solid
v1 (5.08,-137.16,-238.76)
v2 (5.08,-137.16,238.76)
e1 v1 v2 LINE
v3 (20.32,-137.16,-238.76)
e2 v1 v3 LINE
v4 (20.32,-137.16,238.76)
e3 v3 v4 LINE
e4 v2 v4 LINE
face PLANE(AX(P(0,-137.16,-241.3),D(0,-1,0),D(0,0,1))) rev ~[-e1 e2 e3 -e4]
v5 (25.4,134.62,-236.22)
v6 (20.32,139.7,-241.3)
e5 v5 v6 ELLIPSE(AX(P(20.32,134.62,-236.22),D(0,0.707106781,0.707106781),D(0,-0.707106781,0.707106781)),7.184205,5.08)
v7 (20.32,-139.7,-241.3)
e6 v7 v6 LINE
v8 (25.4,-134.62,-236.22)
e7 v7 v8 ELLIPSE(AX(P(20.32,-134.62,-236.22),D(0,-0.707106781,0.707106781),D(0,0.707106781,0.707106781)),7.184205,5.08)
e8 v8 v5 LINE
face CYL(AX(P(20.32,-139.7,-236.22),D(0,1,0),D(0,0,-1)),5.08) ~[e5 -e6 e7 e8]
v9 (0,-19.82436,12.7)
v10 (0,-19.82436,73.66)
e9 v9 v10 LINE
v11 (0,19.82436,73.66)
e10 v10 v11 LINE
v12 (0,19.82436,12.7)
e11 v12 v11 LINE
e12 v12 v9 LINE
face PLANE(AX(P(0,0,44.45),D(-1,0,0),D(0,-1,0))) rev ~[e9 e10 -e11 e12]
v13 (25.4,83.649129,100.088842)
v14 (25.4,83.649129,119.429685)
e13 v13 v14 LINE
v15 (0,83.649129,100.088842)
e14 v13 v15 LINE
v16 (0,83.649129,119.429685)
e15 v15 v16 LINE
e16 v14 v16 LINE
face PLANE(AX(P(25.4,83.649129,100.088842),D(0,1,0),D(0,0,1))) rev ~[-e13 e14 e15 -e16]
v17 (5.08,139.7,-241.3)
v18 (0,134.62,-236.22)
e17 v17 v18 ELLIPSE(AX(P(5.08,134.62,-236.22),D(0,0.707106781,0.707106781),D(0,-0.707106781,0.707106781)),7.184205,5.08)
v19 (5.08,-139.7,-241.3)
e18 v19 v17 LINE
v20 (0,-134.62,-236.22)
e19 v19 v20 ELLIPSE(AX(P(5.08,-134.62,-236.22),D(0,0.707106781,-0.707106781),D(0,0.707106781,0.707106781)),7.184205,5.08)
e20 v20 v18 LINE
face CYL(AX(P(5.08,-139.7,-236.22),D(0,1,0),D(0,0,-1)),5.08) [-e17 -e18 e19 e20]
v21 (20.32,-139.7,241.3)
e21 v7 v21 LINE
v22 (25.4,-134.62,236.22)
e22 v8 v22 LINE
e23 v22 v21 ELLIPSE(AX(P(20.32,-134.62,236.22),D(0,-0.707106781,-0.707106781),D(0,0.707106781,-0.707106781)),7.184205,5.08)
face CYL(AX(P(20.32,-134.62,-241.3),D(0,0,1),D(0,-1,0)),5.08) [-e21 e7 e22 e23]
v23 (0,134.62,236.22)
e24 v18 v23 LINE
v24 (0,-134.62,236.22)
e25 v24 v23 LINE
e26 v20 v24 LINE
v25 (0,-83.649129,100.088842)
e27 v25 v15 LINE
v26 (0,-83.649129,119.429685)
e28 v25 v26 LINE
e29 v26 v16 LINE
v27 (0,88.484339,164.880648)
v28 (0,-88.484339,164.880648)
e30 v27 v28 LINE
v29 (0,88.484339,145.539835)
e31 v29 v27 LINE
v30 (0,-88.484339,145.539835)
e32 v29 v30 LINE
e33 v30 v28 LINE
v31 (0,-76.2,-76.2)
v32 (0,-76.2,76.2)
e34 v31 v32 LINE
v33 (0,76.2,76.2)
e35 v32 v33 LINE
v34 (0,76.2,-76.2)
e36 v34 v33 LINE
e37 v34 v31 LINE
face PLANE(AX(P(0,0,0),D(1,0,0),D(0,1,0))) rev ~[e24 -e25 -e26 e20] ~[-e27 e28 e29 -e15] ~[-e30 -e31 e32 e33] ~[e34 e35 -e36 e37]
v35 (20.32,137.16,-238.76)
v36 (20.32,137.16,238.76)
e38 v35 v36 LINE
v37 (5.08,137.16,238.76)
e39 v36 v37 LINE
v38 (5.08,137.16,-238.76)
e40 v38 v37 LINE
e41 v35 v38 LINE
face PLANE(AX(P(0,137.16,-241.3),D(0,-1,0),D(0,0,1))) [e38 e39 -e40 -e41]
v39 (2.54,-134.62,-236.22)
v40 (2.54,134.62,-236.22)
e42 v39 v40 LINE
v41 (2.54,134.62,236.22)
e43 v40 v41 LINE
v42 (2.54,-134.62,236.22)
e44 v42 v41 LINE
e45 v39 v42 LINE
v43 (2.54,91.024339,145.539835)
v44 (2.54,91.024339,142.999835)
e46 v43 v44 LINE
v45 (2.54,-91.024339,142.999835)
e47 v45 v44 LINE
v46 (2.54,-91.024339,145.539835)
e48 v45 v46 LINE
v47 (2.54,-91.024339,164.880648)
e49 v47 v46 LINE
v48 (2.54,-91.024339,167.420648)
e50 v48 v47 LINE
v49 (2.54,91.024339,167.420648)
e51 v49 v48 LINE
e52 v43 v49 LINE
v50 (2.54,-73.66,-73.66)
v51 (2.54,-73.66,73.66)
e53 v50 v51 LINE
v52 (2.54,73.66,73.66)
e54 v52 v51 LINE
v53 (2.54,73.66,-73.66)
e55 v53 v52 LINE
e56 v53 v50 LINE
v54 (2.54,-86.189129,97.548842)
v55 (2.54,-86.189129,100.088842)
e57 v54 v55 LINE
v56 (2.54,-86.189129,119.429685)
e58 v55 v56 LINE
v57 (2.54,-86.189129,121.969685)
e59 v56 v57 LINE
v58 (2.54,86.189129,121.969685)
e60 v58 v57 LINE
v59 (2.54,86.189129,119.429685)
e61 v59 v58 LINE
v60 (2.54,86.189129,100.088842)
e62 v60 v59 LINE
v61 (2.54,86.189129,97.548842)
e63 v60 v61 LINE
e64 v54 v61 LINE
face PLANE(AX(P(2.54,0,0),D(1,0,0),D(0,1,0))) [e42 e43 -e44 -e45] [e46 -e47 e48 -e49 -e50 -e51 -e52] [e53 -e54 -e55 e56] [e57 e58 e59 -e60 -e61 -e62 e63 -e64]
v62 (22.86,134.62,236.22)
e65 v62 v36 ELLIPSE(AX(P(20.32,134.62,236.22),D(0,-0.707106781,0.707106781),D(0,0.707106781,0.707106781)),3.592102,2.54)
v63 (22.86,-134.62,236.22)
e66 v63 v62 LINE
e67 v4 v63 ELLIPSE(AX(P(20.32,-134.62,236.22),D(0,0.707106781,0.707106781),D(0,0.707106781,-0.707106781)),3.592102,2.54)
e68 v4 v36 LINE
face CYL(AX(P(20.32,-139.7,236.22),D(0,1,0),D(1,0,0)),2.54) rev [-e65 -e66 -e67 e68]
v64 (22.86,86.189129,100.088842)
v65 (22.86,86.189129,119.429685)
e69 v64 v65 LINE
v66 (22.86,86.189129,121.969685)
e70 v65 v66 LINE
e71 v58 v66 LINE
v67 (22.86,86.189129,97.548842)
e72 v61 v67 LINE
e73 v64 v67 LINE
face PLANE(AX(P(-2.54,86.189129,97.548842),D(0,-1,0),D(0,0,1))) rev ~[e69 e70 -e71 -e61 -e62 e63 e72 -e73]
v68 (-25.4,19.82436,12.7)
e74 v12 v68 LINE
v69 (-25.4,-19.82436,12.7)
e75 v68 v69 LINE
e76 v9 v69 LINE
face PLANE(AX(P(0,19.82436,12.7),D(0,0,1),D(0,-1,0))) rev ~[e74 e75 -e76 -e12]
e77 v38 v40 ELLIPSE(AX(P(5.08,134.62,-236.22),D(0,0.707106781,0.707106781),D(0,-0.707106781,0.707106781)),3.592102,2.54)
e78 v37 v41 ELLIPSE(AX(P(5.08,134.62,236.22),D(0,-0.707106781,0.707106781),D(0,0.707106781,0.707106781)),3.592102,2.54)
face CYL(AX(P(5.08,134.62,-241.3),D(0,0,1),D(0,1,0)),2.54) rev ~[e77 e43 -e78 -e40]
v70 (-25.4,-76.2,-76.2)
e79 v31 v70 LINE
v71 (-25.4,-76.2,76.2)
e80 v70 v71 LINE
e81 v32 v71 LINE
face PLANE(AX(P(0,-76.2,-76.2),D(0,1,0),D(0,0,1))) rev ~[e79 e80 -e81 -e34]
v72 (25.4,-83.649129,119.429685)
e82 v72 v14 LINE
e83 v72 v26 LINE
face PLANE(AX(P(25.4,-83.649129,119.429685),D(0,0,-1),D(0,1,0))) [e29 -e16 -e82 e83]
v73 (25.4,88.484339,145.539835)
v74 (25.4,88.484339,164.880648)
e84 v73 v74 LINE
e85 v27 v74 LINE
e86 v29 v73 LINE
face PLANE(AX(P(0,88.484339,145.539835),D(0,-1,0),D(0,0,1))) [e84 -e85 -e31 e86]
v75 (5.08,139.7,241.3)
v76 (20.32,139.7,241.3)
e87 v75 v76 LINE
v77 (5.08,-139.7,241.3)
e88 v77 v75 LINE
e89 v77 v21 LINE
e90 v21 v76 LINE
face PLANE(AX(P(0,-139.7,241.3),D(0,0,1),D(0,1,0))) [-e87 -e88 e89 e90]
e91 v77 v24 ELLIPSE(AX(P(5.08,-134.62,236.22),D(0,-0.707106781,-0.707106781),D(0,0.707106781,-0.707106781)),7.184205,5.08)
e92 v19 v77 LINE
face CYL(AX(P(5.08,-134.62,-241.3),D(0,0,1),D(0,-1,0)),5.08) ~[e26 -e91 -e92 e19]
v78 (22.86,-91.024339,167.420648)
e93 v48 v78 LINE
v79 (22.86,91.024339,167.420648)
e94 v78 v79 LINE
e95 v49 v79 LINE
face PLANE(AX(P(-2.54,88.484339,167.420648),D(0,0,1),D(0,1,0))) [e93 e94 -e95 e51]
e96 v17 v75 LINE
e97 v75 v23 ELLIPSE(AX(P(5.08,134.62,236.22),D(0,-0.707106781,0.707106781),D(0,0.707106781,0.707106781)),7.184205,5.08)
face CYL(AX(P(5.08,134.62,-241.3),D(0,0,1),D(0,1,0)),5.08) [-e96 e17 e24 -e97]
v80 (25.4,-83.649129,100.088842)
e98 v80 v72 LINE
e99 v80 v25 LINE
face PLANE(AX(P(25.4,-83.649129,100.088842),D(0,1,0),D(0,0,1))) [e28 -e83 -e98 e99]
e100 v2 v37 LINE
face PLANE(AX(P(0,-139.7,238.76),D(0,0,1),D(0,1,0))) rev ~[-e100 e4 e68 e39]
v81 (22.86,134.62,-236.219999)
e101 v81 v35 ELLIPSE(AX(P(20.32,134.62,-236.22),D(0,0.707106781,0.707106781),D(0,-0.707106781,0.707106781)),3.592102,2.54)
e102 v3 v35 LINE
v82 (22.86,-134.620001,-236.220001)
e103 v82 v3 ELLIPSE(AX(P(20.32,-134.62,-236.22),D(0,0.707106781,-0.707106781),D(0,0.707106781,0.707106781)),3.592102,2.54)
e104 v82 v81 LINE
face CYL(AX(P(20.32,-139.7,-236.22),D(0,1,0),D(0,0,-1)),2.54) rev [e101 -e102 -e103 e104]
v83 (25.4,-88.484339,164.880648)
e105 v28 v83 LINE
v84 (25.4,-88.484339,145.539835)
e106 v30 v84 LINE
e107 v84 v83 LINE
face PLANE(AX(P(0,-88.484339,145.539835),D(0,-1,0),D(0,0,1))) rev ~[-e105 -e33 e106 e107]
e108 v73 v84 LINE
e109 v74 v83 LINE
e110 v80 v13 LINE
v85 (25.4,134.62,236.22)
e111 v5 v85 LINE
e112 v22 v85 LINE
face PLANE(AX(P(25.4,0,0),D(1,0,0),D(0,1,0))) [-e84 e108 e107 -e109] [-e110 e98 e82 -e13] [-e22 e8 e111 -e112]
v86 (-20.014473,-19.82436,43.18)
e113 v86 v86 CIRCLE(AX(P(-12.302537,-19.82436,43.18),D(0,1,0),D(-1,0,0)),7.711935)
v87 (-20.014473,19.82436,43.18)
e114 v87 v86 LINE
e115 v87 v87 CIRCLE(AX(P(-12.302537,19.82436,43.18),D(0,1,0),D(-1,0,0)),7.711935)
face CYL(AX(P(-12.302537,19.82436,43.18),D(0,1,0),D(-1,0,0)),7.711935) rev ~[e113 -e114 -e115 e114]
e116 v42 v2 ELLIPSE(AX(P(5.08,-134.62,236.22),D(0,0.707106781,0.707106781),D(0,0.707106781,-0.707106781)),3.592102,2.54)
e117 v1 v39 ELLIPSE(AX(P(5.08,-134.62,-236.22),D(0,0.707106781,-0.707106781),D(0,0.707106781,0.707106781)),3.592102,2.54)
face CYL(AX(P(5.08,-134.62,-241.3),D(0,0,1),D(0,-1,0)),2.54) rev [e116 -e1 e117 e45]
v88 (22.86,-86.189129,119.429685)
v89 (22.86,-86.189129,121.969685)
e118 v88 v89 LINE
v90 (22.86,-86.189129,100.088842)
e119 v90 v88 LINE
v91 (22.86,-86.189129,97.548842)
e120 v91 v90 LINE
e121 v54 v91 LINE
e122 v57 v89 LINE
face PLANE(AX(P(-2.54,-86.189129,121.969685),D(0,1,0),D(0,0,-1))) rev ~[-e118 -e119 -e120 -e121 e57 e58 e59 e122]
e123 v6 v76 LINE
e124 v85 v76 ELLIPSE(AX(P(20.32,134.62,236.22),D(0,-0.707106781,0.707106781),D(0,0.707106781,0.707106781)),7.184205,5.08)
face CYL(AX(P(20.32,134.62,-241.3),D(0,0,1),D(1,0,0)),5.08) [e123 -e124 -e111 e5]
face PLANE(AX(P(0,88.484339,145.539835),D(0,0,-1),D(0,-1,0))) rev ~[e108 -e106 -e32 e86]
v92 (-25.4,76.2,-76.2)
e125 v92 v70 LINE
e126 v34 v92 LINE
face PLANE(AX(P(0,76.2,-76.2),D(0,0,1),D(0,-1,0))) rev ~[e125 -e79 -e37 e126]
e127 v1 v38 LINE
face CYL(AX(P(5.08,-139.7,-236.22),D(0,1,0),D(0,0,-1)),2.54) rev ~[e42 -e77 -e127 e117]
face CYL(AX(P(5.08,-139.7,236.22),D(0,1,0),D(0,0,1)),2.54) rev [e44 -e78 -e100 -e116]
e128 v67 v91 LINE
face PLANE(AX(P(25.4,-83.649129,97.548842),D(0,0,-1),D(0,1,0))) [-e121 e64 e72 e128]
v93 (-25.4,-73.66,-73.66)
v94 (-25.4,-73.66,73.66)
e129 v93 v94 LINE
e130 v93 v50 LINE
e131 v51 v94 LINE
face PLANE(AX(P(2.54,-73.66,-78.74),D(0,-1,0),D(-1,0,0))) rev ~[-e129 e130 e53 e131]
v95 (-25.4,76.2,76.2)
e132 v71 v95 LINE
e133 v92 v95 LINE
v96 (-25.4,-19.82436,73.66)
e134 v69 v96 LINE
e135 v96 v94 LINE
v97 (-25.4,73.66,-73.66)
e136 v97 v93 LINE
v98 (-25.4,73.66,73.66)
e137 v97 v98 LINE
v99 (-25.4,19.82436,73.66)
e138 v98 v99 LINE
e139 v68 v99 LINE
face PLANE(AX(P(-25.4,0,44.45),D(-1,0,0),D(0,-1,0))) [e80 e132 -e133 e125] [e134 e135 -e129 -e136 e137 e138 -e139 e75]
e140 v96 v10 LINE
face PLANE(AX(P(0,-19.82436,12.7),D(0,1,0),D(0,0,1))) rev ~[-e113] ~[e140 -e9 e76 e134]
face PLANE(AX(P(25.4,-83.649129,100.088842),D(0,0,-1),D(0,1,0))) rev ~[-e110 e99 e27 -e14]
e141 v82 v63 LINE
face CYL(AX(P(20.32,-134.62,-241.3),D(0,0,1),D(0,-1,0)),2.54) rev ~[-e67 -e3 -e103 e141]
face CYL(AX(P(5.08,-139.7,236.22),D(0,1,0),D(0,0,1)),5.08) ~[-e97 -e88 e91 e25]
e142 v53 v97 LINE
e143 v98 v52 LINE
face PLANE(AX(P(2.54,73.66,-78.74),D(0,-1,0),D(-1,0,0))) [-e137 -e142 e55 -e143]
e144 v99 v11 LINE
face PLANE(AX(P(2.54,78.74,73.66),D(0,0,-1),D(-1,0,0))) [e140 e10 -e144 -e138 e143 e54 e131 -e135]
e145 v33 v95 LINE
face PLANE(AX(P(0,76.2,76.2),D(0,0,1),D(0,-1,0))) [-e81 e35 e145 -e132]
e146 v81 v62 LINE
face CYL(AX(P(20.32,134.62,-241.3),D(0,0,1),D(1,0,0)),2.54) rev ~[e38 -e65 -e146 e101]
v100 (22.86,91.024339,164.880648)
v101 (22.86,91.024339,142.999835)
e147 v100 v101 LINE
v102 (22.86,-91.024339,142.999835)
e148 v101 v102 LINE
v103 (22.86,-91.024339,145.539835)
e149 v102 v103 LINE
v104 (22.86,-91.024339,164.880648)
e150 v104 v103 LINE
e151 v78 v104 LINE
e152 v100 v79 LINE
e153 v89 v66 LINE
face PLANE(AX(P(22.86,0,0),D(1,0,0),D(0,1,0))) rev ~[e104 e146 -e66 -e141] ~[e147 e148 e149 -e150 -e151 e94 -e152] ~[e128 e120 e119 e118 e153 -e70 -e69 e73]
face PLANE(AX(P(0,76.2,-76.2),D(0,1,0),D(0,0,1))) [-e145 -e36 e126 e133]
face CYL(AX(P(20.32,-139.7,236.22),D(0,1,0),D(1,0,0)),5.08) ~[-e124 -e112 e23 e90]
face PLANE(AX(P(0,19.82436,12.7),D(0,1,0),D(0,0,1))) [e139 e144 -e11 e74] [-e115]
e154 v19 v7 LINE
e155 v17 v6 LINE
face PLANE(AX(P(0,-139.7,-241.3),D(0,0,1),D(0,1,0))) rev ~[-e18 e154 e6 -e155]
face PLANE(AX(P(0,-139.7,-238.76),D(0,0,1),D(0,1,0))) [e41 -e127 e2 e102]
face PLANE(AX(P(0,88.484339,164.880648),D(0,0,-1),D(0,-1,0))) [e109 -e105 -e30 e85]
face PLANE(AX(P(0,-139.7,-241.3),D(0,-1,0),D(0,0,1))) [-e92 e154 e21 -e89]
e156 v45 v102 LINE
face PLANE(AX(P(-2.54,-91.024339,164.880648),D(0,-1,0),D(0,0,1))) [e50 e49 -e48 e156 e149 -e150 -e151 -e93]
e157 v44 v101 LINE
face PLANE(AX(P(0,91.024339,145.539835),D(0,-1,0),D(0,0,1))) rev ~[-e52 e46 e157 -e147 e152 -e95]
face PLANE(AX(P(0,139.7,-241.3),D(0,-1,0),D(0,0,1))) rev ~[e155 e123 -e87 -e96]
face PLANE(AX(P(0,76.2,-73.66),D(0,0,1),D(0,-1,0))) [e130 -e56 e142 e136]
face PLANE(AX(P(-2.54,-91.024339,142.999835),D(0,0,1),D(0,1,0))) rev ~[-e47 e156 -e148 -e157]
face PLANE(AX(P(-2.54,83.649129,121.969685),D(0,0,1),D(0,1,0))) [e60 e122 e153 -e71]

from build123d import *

# Parameters (mm, degrees)
F0_W         = 279.4
F0_H         = 482.6
F1_DEPTH     = 25.4
F2_R         = 5.08
F3_R         = 5.08
F4_W         = 176.9686788321
F4_H         = 19.3408131599
F5_DEPTH     = 25.4
F6_W         = 167.2982573509
F6_H         = 19.3408429623
F7_DEPTH     = 25.4
F8_W         = 152.4
F8_H         = 152.4
F9_DEPTH     = 25.4
F10_T        = 2.54
F10_T3_DEPTH = 157.48
F10_T5_DEPTH = 157.48
F10_T7_DEPTH = 30.48
F11_W        = 39.6487191319
F11_H        = 63.5
F12_DEPTH    = 25.4
F13_R        = 7.7119354401
F14_DEPTH    = 50.8


# Not quite as in the source:
# - a shell that OpenCascade refuses in one call is made with other operations: the cavity is built on its own and cut out


with BuildPart() as f1:
    # F0 (on Right) → F1 (new body)
    with BuildSketch(Plane.YZ):
        Rectangle(F0_W, F0_H)
    extrude(amount=F1_DEPTH)

    # F2
    f2_edges = [f1.edges().sort_by_distance(p)[0] for p in [
        (0, 139.7, 0),
        (0, 0, 241.3),
        (0, -139.7, 0),
        (0, 0, -241.3),
    ]]
    fillet(f2_edges, radius=F2_R)

    # F3
    f3_edges = [f1.edges().sort_by_distance(p)[0] for p in [
        (25.4, 139.7, 0),
        (25.4, 0, 241.3),
        (25.4, -139.7, 0),
        (25.4, 0, -241.3),
    ]]
    fillet(f3_edges, radius=F3_R)

    # F4 (on face) → F5 (cut)
    with BuildSketch(Plane(origin=(0, 0, 0), x_dir=(0, -1, 0), z_dir=(-1, 0, 0))):
        with Locations((0, 155.2102416754)):
            Rectangle(F4_W, F4_H)
    extrude(amount=-F5_DEPTH, mode=Mode.SUBTRACT)

    # F6 (on face) → F7 (cut)
    with BuildSketch(Plane.YZ.offset(25.4)):
        with Locations((0, 109.7592636943)):
            Rectangle(F6_W, F6_H)
    extrude(amount=-F7_DEPTH, mode=Mode.SUBTRACT)

    # F8 (on face) → F9 (join)
    with BuildSketch(Plane(origin=(0, 0, 0), x_dir=(0, -1, 0), z_dir=(-1, 0, 0))):
        Rectangle(F8_W, F8_H)
    extrude(amount=F9_DEPTH)

    # F10: shell of thickness 2.54, made by hand


with BuildPart() as f10_core1:
    # F10_t2: copy of F1
    add(f1.part)

    # the walls: a layer under each face that stays
    f10_faces = [f10_core1.faces().sort_by_distance(p)[0] for p in [
        (12.7, 139.7, 0),
        (12.7, 0, -241.3),
        (23.912103095, 138.2121018019, 0),
        (1.4878975516, 138.2121024484, 0),
        (12.7, 0, 241.3),
        (12.7, -139.7, 0),
        (23.912103095, 0, -239.8121018019),
        (1.4878975516, 0, -239.8121024484),
        (25.4, 0, 0),
        (23.912103095, 0, 239.8121018019),
        (0, -89.7466666667, -157.48),
        (1.4878975516, 0, 239.8121024484),
        (23.912103095, -138.2121018019, 0),
        (1.4878975516, -138.2121024484, 0),
        (12.7, 0, 119.4296851754),
        (12.7, -83.6491286755, 109.7592636943),
        (12.7, 0, 100.0888422132),
        (12.7, 83.6491286755, 109.7592636943),
        (12.7, -88.484339416, 155.2102416754),
        (12.7, 0, 145.5398350954),
        (12.7, 0, 164.8806482553),
        (12.7, 88.484339416, 155.2102416754),
        (-12.7, -76.2, 0),
        (-12.7, 0, -76.2),
        (-12.7, 76.2, 0),
        (-12.7, 0, 76.2),
    ]]
    thicken(f10_faces, amount=-F10_T, mode=Mode.SUBTRACT)

    # F10_s4 → F10_t3 (cut)
    with BuildSketch(Plane.XY.offset(-78.74)):
        Polygon((-0.0254, -76.2254), (2.54, -76.2), (2.54, -73.66), (0, -73.66), align=None)
        Polygon((-0.0254, 76.2254), (2.54, 76.2), (2.54, 73.66), (0, 73.66), align=None)
    extrude(amount=F10_T3_DEPTH, mode=Mode.SUBTRACT)

    # F10_s6 → F10_t5 (cut)
    with BuildSketch(Plane.XZ.offset(-78.74)):
        Polygon((-0.0254, -76.2254), (2.54, -76.2), (2.54, -73.66), (0, -73.66), align=None)
        Polygon((-0.0254, 76.2254), (2.54, 76.2), (2.54, 73.66), (0, 73.66), align=None)
    extrude(amount=F10_T5_DEPTH, mode=Mode.SUBTRACT)

    # F10_s8 → F10_t7 (cut)
    with BuildSketch(Plane.YZ.offset(-2.54)):
        Polygon((83.6237286755, 119.4042851754), (83.6491286755, 121.9696851754), (86.1891286755, 121.9696851754), (86.1891286755, 119.4296851754), align=None)
        Polygon((-83.6237286755, 119.4042851754), (-83.6491286755, 121.9696851754), (-86.1891286755, 121.9696851754), (-86.1891286755, 119.4296851754), align=None)
        Polygon((-83.6237286755, 100.1142422132), (-86.1891286755, 100.0888422132), (-86.1891286755, 97.5488422132), (-83.6491286755, 97.5488422132), align=None)
        Polygon((83.6237286755, 100.1142422132), (83.6491286755, 97.5488422132), (86.1891286755, 97.5488422132), (86.1891286755, 100.0888422132), align=None)
        Polygon((-88.458939416, 145.5652350954), (-91.024339416, 145.5398350954), (-91.024339416, 142.9998350954), (-88.484339416, 142.9998350954), align=None)
        Polygon((-88.458939416, 164.8552482553), (-91.024339416, 164.8806482553), (-91.024339416, 167.4206482553), (-88.484339416, 167.4206482553), align=None)
        Polygon((88.458939416, 145.5652350954), (88.484339416, 142.9998350954), (91.024339416, 142.9998350954), (91.024339416, 145.5398350954), align=None)
        Polygon((88.458939416, 164.8552482553), (88.484339416, 167.4206482553), (91.024339416, 167.4206482553), (91.024339416, 164.8806482553), align=None)
    extrude(amount=F10_T7_DEPTH, mode=Mode.SUBTRACT)


with BuildPart() as f1_1:
    add(f1.part)

    # what is left inside the walls is the cavity
    f10_cavity = [f10_core1.part.solids().sort_by_distance(p)[0] for p in [
        (22.8346, 0, -78.74),
    ]]
    add(f10_cavity, mode=Mode.SUBTRACT)

    # F11 (on face) → F12 (join)
    with BuildSketch(Plane(origin=(0, 0, 0), x_dir=(0, -1, 0), z_dir=(-1, 0, 0))):
        with Locations((0, 44.45)):
            Rectangle(F11_W, F11_H)
    extrude(amount=F12_DEPTH)

    # F13 (on face) → F14 (cut)
    with BuildSketch(Plane(origin=(0, 19.824359566, 0), x_dir=(-1, 0, 0), z_dir=(0, 1, 0))):
        with Locations((12.3025374487, 43.18)):
            Circle(F13_R)
    extrude(amount=-F14_DEPTH, mode=Mode.SUBTRACT)


solid = f1_1.part
